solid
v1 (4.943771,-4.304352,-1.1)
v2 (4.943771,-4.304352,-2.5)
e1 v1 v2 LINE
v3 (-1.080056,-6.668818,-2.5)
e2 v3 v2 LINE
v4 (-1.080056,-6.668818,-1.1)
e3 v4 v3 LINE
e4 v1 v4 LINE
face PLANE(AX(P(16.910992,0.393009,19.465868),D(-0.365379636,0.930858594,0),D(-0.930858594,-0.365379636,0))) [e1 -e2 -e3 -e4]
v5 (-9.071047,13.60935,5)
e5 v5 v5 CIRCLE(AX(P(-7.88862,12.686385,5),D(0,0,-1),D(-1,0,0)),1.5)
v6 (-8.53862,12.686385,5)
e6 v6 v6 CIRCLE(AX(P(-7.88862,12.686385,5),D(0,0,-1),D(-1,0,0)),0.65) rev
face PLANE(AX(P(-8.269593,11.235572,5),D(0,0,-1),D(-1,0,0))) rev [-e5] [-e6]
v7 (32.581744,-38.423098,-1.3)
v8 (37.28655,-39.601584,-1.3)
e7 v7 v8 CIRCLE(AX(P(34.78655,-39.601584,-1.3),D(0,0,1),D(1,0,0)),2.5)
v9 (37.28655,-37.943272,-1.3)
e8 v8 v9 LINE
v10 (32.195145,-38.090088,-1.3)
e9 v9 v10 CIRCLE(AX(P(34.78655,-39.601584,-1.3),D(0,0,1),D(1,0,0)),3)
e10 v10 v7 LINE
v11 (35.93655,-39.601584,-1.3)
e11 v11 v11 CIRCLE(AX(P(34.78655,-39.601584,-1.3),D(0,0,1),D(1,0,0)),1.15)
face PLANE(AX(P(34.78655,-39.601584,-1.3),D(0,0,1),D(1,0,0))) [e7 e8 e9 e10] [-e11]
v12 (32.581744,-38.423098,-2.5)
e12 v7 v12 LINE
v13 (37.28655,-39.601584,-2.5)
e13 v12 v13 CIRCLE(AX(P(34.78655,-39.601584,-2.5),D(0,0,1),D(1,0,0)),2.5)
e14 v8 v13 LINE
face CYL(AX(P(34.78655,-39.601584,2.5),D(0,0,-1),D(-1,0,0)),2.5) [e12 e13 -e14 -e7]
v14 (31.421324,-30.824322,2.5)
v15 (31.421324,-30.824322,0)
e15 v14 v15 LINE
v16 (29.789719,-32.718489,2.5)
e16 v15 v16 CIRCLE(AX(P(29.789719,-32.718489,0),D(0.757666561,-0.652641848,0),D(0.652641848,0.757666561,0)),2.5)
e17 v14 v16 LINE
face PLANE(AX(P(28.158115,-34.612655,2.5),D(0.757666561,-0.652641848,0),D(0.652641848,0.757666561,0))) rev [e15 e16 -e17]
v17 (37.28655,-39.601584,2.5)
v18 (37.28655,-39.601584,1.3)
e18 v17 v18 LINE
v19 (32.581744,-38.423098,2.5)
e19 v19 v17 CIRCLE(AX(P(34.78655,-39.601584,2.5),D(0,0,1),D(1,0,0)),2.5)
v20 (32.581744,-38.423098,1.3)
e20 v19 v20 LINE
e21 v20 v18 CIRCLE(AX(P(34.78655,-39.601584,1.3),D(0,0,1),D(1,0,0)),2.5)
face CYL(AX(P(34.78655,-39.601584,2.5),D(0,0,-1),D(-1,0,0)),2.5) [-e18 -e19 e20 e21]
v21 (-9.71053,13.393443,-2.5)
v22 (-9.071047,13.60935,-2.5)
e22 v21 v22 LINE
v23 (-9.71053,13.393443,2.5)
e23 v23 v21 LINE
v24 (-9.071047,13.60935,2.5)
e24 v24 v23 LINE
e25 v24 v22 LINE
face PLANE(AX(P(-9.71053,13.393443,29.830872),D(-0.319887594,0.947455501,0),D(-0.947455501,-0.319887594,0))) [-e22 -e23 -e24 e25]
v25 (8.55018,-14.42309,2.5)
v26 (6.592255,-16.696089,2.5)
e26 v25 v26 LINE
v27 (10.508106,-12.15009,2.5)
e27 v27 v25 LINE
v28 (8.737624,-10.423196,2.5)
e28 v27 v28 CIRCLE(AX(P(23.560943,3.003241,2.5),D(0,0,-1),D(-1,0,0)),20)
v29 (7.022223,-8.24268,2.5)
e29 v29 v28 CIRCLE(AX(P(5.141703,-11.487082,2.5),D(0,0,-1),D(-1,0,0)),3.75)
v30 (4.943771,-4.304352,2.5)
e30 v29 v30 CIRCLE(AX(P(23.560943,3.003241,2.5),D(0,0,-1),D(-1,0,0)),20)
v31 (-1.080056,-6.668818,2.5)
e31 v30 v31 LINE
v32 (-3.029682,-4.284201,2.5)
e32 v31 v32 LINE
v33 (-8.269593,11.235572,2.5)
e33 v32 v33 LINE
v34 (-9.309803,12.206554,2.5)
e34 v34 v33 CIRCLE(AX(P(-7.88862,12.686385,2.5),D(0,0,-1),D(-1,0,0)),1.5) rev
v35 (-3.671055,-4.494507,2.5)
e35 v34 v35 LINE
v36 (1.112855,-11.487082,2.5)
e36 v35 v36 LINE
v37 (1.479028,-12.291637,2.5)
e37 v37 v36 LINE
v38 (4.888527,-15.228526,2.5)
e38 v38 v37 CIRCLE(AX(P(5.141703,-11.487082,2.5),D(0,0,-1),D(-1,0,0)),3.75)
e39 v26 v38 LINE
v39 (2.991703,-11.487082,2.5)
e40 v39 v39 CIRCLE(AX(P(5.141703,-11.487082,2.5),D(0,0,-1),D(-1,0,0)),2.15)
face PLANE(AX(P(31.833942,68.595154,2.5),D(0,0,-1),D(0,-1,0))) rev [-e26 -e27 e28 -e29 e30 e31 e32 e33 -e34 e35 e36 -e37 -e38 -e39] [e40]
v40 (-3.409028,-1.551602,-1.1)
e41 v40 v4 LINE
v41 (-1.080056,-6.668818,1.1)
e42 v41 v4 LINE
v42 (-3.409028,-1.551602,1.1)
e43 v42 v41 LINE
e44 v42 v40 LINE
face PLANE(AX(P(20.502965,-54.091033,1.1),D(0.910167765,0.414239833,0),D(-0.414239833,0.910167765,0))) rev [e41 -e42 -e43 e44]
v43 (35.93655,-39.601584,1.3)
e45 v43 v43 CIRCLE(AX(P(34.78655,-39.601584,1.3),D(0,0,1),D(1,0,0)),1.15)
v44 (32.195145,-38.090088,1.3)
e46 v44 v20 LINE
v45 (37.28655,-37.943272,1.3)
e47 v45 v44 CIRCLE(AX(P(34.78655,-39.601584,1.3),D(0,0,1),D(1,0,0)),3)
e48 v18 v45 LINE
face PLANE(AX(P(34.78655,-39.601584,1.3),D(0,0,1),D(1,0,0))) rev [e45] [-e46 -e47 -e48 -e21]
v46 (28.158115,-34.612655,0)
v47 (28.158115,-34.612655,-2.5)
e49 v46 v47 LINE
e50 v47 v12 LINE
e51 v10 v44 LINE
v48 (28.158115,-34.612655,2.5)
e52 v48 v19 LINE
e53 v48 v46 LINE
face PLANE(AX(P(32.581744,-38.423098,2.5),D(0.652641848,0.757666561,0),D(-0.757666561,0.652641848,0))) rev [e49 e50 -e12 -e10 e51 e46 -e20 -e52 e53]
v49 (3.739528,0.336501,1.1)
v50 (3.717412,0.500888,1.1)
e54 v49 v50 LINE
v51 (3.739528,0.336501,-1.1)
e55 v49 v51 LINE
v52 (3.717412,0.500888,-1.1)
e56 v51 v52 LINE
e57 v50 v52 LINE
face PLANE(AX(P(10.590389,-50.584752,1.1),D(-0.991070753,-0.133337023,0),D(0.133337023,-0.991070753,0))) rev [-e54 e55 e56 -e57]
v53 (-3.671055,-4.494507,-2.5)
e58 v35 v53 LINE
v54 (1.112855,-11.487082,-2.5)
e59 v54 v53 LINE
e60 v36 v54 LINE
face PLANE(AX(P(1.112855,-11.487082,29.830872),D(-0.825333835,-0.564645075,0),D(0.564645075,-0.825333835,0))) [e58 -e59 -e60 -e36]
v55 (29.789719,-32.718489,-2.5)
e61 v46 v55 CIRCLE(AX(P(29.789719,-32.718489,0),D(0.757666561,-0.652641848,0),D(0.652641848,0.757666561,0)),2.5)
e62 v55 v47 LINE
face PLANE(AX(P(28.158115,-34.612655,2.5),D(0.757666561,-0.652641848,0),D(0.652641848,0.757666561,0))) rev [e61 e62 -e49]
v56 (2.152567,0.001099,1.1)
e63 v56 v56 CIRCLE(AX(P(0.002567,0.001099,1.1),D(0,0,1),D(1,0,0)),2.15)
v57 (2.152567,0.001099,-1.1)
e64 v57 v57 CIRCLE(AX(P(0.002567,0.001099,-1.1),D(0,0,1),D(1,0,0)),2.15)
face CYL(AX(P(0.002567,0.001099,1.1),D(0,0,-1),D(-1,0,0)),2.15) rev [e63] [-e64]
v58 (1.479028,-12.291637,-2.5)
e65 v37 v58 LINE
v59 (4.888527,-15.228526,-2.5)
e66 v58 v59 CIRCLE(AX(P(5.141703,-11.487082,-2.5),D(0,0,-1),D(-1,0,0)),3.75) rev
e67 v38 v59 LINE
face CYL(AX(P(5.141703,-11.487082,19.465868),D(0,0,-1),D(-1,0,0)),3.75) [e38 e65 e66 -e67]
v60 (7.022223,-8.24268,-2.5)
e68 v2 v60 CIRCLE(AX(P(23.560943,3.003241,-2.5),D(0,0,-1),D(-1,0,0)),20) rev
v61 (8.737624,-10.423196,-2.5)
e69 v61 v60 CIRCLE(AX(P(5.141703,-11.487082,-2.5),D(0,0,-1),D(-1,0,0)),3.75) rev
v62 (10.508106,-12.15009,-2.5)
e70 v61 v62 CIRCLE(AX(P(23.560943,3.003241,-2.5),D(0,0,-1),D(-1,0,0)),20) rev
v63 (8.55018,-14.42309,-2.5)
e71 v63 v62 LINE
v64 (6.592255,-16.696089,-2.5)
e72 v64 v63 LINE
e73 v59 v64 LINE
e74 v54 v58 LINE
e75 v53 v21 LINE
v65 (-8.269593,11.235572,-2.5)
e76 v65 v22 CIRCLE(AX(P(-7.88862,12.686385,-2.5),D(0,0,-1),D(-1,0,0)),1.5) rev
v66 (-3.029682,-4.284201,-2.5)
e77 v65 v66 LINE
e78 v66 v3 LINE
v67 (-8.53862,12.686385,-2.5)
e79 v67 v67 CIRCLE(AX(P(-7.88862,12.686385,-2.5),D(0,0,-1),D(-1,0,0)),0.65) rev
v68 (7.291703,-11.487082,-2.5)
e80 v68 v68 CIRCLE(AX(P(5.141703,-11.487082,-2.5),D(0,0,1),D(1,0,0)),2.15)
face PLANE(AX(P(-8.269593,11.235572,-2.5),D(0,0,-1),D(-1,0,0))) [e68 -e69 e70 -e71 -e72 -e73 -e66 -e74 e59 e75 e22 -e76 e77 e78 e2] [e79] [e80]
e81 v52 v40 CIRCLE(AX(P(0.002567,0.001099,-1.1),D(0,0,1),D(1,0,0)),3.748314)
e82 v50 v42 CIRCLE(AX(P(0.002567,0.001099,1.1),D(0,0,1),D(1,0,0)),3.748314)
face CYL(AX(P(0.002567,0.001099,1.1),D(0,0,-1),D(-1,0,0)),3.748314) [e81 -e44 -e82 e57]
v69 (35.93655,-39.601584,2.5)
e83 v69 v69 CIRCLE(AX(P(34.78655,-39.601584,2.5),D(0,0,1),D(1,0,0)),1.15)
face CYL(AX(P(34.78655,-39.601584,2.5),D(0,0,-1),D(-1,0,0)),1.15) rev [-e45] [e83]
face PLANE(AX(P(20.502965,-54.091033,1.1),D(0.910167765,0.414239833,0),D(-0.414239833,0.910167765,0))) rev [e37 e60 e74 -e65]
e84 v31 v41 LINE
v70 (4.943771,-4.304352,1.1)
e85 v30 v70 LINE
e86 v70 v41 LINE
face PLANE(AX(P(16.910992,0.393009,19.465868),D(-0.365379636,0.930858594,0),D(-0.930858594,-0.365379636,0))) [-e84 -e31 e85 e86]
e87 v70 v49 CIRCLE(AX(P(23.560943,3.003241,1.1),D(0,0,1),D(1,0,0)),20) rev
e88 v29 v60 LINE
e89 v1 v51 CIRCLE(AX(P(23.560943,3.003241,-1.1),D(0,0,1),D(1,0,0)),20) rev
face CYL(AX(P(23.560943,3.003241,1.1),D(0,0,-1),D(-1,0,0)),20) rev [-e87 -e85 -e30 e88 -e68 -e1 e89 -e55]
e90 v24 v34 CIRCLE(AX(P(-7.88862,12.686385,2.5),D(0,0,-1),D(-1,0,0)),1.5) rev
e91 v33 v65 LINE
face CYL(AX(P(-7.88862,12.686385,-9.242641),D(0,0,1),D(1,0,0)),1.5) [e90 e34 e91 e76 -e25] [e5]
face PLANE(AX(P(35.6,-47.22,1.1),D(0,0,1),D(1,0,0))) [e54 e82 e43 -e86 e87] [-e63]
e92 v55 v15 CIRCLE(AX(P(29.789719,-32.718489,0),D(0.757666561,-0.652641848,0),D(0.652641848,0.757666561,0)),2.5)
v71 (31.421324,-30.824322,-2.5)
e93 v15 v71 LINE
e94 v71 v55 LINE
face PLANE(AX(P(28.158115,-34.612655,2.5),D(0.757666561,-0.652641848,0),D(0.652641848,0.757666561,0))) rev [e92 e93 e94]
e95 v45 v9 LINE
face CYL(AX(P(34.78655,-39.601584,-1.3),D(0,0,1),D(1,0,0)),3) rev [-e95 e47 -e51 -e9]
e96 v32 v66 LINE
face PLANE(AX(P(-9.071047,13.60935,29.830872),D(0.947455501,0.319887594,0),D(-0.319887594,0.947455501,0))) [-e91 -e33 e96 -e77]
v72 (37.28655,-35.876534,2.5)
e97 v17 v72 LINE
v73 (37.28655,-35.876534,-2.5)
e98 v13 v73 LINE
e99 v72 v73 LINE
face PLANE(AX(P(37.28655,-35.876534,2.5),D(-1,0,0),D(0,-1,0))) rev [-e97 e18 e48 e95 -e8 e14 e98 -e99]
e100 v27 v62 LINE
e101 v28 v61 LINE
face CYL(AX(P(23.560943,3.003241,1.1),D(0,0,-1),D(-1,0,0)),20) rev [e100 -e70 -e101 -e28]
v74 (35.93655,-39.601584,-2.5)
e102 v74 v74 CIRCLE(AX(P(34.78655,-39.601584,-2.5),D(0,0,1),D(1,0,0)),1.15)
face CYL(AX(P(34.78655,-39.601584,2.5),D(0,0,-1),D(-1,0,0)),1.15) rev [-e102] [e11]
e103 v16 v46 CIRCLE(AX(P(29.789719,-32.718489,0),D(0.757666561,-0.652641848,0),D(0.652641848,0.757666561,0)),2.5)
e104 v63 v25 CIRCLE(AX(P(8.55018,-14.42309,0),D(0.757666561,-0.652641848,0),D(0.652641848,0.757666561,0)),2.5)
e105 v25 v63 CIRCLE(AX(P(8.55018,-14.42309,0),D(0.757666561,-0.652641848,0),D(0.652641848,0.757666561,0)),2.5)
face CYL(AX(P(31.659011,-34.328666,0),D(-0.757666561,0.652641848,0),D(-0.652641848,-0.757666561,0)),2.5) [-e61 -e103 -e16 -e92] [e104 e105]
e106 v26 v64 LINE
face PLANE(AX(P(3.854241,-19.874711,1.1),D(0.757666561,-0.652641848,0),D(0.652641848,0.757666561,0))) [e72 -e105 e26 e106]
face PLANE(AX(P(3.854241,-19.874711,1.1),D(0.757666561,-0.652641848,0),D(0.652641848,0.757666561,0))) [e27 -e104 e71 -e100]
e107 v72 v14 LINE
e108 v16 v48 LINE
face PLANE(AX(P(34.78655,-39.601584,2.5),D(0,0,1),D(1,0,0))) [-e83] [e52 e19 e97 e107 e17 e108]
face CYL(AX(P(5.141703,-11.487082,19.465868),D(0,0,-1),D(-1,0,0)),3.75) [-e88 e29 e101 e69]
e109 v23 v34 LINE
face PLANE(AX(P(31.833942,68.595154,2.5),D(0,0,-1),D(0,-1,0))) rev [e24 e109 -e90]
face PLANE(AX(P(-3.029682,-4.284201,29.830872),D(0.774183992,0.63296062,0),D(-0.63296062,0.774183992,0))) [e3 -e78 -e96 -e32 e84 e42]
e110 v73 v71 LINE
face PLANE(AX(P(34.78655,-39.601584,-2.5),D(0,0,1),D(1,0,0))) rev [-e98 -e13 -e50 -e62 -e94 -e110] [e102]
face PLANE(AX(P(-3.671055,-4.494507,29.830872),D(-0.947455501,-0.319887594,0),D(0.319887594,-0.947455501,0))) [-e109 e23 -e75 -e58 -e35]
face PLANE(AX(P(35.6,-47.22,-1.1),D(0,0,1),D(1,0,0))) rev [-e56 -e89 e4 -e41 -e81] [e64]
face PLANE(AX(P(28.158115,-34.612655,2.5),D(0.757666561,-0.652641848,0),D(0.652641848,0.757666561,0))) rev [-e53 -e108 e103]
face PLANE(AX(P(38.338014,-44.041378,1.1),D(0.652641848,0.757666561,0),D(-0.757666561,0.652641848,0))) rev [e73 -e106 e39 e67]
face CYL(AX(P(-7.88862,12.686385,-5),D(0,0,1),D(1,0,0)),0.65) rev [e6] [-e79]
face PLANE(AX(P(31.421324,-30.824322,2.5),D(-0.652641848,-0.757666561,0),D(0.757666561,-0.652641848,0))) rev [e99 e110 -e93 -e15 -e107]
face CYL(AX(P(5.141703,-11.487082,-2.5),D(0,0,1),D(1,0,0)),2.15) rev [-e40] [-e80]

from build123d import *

# Parameters (mm, degrees)
SKETCH1_R               = 3.748314074
SKETCH1_R_2             = 2.15
BOSS_EXTRUDE1_DEPTH     = 1.1
BOSS_EXTRUDE2_START     = -2.5
BOSS_EXTRUDE2_DEPTH     = 5
SKETCH3_R               = 2.5
BOSS_EXTRUDE3_DEPTH     = 30.5
BOSS_EXTRUDE4_REACH     = 66.583
CUT_EXTRUDE1_DEPTH      = 77.014827373
CUT_EXTRUDE1_DEPTH_BACK = 77.014827373
SKETCH5_R               = 2.15
SKETCH6_R               = 1.15
BOSS_EXTRUDE5_DEPTH     = 2.5
SKETCH7_R               = 3
CUT_EXTRUDE2_DEPTH      = 1.3
BOSS_EXTRUDE6_START     = -7.5
SKETCH8_R               = 1.5
BOSS_EXTRUDE6_DEPTH     = 7.5
CUT_EXTRUDE3_DEPTH      = 77.681407452
CUT_EXTRUDE3_DEPTH_BACK = 77.681407452
SKETCH9_R               = 0.65


with BuildPart() as part:
    # Sketch1 → Boss-Extrude1 (new, symmetric)
    # profile 1 of 2: a face of its own
    with BuildSketch(Plane.XY):
        with BuildLine():
            Line((-29.007745084, 30.523910578), (-25.091893995, 35.069909945))
            ThreePointArc((-25.091893995, 35.069909945), (-29.621942143, 40.692126277), (-31.860472098, 47.55650071))
            Line((-31.860472098, 47.55650071), (-31.88258847, 47.720887837))
            ThreePointArc((-31.88258847, 47.720887837), (-31.857495615, 47.471553034), (-31.84911885, 47.221098797))
            ThreePointArc((-31.84911885, 47.221098797), (-34.80303687, 43.557931682), (-39.009027568, 45.6683978))
            Line((-39.009027568, 45.6683978), (-34.12097225, 34.928362615))
            Line((-34.12097225, 34.928362615), (-29.007745084, 30.523910578))
        make_face()
    # profile 2 of 2: a face of its own
    with BuildSketch(Plane.XY):
        with Locations((-35.597432924, 47.221098797)):
            Circle(SKETCH1_R)
        with Locations((-35.597432924, 47.221098797)):
            Circle(SKETCH1_R_2, mode=Mode.SUBTRACT)
    extrude(amount=BOSS_EXTRUDE1_DEPTH, both=True)

    # Boss-Extrude2: read off the stored shape, not the designer's step
    # Boss-Extrude2 outline → Boss-Extrude2 (add)
    with BuildSketch(Plane.XY.offset(BOSS_EXTRUDE2_START)):
        with BuildLine():
            ThreePointArc((-25.091893995, 35.069909945), (-26.003854199, 35.905963494), (-26.862376119, 36.796804144))
            ThreePointArc((-26.862376119, 36.796804144), (-27.511007835, 38.051535597), (-28.577777167, 38.977320299))
            ThreePointArc((-28.577777167, 38.977320299), (-29.726956647, 40.888456377), (-30.656228901, 42.915648441))
            Line((-30.656228901, 42.915648441), (-36.680056275, 40.551182055))
            Line((-36.680056275, 40.551182055), (-34.12097225, 34.928362615))
            ThreePointArc((-34.12097225, 34.928362615), (-32.905703874, 32.891668535), (-30.711472725, 31.991474297))
            Line((-30.711472725, 31.991474297), (-29.007745084, 30.523910578))
            Line((-29.007745084, 30.523910578), (-25.091893995, 35.069909945))
        make_face()
    extrude(amount=BOSS_EXTRUDE2_DEPTH)

    # Sketch3 → Boss-Extrude3 (add)
    with BuildSketch(Plane(origin=(-31.745759068, 27.345288728, 0), x_dir=(0, 0, -1), z_dir=(0.7576665611269928, -0.6526418482981281, 0))):
        with Locations((0, 7.195277993)):
            Circle(SKETCH3_R)
    extrude(amount=BOSS_EXTRUDE3_DEPTH)

    # Boss-Extrude4: up to this face of the body (flat: up to its plane)
    boss_extrude4_end = Plane(part.part.faces().sort_by_distance((-30.992912772, 36.816549457, 2.5))[0])
    # Sketch4 → Boss-Extrude4 (add, up to the picked face)
    with BuildSketch(Plane(origin=(0, 0, -2.5), x_dir=(-1, 0, 0), z_dir=(0, 0, -1)), mode=Mode.PRIVATE) as boss_extrude4_sk1:
        Polygon((44.67104718, 60.829350293), (38.62968166, 42.935799229), (36.680056275, 40.551182055), (34.487145344, 35.732918139), (39.271055483, 42.725492907), (45.31052994, 60.613442948), align=None)
    boss_extrude4_tool1 = split(extrude(boss_extrude4_sk1.sketch, amount=-BOSS_EXTRUDE4_REACH, mode=Mode.PRIVATE), bisect_by=boss_extrude4_end, keep=Keep.BOTH, mode=Mode.PRIVATE)
    add(boss_extrude4_tool1.solids().sort_by(Axis((-40.62976, 48.582602, -2.5), (0, 0, 1)))[0])

    # Sketch5 → Cut-Extrude1 (cut, two sides: drawn at the far end of the back side and taken through both)
    with BuildSketch(Plane.XY.offset(2.5).offset(-CUT_EXTRUDE1_DEPTH_BACK)):
        with Locations((-30.458296942, 35.732918139)):
            Circle(SKETCH5_R)
    extrude(amount=CUT_EXTRUDE1_DEPTH + CUT_EXTRUDE1_DEPTH_BACK, mode=Mode.SUBTRACT)

    # Sketch6 → Boss-Extrude5 (add, symmetric)
    with BuildSketch(Plane.XY):
        with BuildLine():
            Line((-3.018256327, 8.79690186), (-7.441885155, 12.607344927))
            Line((-7.441885155, 12.607344927), (-4.178675914, 16.395677733))
            Line((-4.178675914, 16.395677733), (1.686549766, 11.343466212))
            Line((1.686549766, 11.343466212), (1.686549766, 7.618415505))
            ThreePointArc((1.686549766, 7.618415505), (-1.420897666, 5.193336616), (-3.018256327, 8.79690186))
        make_face()
        with Locations((-0.813450234, 7.618415505)):
            Circle(SKETCH6_R, mode=Mode.SUBTRACT)
    extrude(amount=BOSS_EXTRUDE5_DEPTH, both=True)

    # Sketch7 → Cut-Extrude2 (cut, symmetric)
    with BuildSketch(Plane.XY):
        with Locations((-0.813450234, 7.618415505)):
            Circle(SKETCH7_R)
    extrude(amount=CUT_EXTRUDE2_DEPTH, both=True, mode=Mode.SUBTRACT)

    # Sketch8 → Boss-Extrude6 (add)
    with BuildSketch(Plane.XY.offset(2.5).offset(BOSS_EXTRUDE6_START)):
        with Locations(Location((-43.488619522, 59.906385053, 0), (0, 0, 255.286714902))):
            Circle(SKETCH8_R)
    extrude(amount=BOSS_EXTRUDE6_DEPTH)

    # Sketch9 → Cut-Extrude3 (cut, two sides: drawn at the far end of the back side and taken through both)
    with BuildSketch(Plane.XY.offset(2.5).offset(-CUT_EXTRUDE3_DEPTH_BACK)):
        with Locations((-43.488619522, 59.906385053)):
            Circle(SKETCH9_R)
    extrude(amount=CUT_EXTRUDE3_DEPTH + CUT_EXTRUDE3_DEPTH_BACK, mode=Mode.SUBTRACT)


with BuildPart() as part_1:
    # Body-Move/Copy1: moved
    add(part.part.moved(Location((35.6, -47.22, 0))))


with BuildPart() as body_2:
    # Split1: read off the stored shape, not the designer's step
    # Split1: the piece on the far side of the plane
    add(part_1.part)
    split(bisect_by=Plane.XY.offset(-2.5), keep=Keep.BOTTOM)


with BuildPart() as part_2:
    add(part_1.part)

    # Split1
    split(bisect_by=Plane.XY.offset(-2.5), keep=Keep.TOP)


with BuildPart() as body_2_1:
    # Body-Move/Copy2: read off the stored shape, not the designer's step
    # Body-Move/Copy2: moved
    add(body_2.part.moved(Location((0, 0, 7.5))))


with BuildPart() as part_3:
    add(part_2.part)

    # Combine1: read off the stored shape, not the designer's step
    # Combine1: union body 2
    add(body_2_1.part)


solid = part_3.part
